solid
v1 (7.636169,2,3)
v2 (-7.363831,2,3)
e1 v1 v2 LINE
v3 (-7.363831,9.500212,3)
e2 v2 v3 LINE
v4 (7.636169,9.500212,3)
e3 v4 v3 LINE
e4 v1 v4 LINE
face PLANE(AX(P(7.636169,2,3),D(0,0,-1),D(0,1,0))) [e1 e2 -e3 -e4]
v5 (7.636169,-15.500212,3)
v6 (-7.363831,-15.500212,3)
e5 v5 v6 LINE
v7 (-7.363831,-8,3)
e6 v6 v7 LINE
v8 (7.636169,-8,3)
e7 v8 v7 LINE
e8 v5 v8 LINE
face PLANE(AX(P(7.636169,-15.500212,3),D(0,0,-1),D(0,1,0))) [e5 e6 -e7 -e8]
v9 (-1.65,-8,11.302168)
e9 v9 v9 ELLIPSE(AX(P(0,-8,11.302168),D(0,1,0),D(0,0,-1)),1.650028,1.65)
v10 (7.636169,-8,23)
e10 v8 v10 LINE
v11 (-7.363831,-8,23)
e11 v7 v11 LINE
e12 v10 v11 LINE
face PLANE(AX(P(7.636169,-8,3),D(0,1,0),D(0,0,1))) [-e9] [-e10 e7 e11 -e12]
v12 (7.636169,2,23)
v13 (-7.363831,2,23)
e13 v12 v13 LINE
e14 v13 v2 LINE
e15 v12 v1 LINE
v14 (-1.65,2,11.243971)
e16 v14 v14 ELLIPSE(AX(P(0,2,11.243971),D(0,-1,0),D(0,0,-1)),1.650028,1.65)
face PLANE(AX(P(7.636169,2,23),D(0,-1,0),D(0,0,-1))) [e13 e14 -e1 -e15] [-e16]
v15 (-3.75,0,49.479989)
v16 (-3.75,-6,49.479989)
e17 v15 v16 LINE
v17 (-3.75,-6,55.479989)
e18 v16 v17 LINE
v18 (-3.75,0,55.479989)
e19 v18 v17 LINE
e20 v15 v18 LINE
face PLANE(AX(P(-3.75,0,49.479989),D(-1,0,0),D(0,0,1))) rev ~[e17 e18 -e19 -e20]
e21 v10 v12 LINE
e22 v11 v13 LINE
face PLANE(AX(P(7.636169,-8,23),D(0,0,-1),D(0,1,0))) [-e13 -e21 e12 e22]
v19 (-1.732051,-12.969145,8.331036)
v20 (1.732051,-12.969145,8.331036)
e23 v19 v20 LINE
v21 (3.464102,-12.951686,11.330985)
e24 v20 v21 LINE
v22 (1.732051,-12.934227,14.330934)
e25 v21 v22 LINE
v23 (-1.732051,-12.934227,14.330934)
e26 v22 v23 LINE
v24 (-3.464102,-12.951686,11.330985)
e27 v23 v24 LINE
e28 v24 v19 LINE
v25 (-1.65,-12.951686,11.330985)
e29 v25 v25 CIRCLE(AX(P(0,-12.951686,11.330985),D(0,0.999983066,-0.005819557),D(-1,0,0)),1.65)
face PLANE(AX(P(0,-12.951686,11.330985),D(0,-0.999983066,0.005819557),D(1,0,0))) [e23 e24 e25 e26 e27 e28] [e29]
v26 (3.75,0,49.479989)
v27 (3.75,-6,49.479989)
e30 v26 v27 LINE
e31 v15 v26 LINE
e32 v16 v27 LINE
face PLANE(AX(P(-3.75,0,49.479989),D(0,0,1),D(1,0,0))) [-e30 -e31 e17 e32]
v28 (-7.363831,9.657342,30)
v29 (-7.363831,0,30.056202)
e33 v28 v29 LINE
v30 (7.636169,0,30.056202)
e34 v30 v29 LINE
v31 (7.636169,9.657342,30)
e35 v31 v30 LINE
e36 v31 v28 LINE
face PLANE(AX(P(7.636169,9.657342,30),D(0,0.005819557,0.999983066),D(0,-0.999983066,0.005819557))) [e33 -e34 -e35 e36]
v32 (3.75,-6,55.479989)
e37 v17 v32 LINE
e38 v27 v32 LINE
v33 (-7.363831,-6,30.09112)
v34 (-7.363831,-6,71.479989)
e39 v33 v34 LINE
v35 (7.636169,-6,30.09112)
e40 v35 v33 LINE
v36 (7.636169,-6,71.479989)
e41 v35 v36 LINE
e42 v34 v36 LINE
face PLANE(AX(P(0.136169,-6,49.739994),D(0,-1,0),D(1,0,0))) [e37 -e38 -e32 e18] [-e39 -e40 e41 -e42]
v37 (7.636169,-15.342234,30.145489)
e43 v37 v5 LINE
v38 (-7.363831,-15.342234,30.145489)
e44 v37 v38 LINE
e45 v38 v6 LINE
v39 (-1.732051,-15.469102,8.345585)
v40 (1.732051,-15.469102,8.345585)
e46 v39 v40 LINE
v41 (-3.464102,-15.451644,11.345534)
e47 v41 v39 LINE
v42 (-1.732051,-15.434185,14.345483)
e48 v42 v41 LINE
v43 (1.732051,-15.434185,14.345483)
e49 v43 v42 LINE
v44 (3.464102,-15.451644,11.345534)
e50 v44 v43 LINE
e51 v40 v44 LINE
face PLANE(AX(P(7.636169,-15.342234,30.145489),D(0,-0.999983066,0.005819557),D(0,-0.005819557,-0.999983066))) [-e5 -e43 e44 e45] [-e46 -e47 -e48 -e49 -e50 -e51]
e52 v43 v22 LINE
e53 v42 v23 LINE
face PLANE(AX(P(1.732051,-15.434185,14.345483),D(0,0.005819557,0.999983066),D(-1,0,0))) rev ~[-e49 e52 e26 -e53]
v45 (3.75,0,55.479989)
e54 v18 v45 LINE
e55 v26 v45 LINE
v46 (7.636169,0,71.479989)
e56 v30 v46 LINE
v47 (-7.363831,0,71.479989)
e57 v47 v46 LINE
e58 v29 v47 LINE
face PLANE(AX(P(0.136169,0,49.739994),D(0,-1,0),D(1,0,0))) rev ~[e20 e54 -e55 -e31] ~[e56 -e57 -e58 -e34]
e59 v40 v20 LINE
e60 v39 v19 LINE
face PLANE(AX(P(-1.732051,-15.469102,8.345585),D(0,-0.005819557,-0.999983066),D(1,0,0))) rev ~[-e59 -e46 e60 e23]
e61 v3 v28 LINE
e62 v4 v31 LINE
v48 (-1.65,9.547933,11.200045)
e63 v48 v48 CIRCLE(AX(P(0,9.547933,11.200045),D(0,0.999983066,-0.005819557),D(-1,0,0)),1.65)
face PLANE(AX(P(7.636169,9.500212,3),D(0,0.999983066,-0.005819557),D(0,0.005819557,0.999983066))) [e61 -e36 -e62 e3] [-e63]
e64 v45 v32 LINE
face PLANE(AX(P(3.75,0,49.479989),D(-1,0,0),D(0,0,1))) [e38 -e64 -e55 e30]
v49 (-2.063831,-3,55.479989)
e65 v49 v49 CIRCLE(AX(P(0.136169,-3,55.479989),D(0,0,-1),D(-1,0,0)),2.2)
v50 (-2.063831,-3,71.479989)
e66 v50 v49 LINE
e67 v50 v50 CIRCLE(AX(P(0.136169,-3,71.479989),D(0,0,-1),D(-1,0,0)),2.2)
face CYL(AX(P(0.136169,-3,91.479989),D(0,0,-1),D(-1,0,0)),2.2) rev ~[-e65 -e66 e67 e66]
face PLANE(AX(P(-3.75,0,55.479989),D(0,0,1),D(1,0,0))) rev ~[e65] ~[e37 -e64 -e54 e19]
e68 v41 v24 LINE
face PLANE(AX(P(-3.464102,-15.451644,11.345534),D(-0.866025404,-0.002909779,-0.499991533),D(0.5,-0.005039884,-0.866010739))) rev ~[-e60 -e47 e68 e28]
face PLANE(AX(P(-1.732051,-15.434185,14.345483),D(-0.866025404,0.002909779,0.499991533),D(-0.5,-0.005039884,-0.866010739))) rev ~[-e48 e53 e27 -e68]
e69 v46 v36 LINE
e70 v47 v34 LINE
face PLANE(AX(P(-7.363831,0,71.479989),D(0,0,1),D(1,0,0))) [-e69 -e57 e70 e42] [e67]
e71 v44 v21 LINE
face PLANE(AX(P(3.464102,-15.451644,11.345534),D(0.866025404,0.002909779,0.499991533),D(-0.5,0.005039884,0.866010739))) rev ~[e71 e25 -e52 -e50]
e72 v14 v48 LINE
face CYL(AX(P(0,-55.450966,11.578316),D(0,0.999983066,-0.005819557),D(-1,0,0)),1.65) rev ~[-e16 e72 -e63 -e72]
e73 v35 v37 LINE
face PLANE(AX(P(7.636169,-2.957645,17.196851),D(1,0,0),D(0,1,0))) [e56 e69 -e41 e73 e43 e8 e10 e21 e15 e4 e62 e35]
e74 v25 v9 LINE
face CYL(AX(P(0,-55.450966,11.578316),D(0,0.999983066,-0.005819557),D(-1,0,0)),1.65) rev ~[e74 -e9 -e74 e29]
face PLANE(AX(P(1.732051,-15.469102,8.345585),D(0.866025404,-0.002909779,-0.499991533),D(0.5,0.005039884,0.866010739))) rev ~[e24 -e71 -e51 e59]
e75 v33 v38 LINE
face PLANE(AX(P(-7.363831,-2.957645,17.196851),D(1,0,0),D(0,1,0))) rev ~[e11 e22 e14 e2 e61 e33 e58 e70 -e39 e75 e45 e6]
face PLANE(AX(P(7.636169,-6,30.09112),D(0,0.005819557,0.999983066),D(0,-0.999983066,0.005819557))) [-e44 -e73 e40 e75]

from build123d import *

# Parameters (mm, degrees)
F0_W     = 15
F0_H     = 43.4799888134
F0_W_2   = 7.5
F0_H_2   = 6
F1_DEPTH = 6
F3_DEPTH = 15
F5_D     = 4.4
F5_DEPTH = 20
F5_TIP   = 1.3218933619
F7_D     = 3.3
F7_DEPTH = 40
F7_TIP   = 0.9914200214
F8_DEPTH = 2.5


with BuildPart() as f1:
    # F0 (on Front) → F1 (new body)
    with BuildSketch(Plane.XZ):
        with Locations((0.1361690943, 49.7399944067)):
            Rectangle(F0_W, F0_H)
        with Locations((0, 52.4799888134)):
            Rectangle(F0_W_2, F0_H_2, mode=Mode.SUBTRACT)
    extrude(amount=F1_DEPTH)

    # F2 (on face) → F3 (join)
    with BuildSketch(Plane.YZ.offset(7.6361690943)):
        Polygon((9.5002116757, 3), (9.6573423812, 30), (0, 30.0562024082), (0, 28), (-6, 28), (-6, 30.0911203428), (-15.3422342746, 30.1454889303), (-15.5002116757, 3), (-8, 3), (-8, 23), (2, 23), (2, 3), align=None)
    extrude(amount=-F3_DEPTH)

    # F5
    with Locations(Plane.XY.offset(71.4799888134)):
        with Locations((0.1361690943, -3)):
            Hole(F5_D / 2, depth=F5_DEPTH)
            with Locations((0, 0, -(F5_DEPTH + F5_TIP / 2))):  # 118° drill point
                Cone(0, F5_D / 2, F5_TIP, mode=Mode.SUBTRACT)

    # F7
    with Locations(Plane(origin=(0, -15.5171451022, 0.0903044429), x_dir=(1, 0, 0), z_dir=(0, -0.9999830662, 0.0058195572))):
        with Locations((0, 11.2554198566)):
            Hole(F7_D / 2, depth=F7_DEPTH)
            with Locations((0, 0, -(F7_DEPTH + F7_TIP / 2))):  # 118° drill point
                Cone(0, F7_D / 2, F7_TIP, mode=Mode.SUBTRACT)

    # F6 (on face) → F8 (cut)
    with BuildSketch(Plane(origin=(0, -15.5171451022, 0.0903044429), x_dir=(1, 0, 0), z_dir=(0, -0.9999830662, 0.0058195572))):
        Polygon((1.7320508076, 14.2554198566), (-1.7320508076, 14.2554198566), (-3.4641016151, 11.2554198566), (-1.7320508076, 8.2554198566), (1.7320508076, 8.2554198566), (3.4641016151, 11.2554198566), align=None)
    extrude(amount=-F8_DEPTH, mode=Mode.SUBTRACT)


solid = f1.part
